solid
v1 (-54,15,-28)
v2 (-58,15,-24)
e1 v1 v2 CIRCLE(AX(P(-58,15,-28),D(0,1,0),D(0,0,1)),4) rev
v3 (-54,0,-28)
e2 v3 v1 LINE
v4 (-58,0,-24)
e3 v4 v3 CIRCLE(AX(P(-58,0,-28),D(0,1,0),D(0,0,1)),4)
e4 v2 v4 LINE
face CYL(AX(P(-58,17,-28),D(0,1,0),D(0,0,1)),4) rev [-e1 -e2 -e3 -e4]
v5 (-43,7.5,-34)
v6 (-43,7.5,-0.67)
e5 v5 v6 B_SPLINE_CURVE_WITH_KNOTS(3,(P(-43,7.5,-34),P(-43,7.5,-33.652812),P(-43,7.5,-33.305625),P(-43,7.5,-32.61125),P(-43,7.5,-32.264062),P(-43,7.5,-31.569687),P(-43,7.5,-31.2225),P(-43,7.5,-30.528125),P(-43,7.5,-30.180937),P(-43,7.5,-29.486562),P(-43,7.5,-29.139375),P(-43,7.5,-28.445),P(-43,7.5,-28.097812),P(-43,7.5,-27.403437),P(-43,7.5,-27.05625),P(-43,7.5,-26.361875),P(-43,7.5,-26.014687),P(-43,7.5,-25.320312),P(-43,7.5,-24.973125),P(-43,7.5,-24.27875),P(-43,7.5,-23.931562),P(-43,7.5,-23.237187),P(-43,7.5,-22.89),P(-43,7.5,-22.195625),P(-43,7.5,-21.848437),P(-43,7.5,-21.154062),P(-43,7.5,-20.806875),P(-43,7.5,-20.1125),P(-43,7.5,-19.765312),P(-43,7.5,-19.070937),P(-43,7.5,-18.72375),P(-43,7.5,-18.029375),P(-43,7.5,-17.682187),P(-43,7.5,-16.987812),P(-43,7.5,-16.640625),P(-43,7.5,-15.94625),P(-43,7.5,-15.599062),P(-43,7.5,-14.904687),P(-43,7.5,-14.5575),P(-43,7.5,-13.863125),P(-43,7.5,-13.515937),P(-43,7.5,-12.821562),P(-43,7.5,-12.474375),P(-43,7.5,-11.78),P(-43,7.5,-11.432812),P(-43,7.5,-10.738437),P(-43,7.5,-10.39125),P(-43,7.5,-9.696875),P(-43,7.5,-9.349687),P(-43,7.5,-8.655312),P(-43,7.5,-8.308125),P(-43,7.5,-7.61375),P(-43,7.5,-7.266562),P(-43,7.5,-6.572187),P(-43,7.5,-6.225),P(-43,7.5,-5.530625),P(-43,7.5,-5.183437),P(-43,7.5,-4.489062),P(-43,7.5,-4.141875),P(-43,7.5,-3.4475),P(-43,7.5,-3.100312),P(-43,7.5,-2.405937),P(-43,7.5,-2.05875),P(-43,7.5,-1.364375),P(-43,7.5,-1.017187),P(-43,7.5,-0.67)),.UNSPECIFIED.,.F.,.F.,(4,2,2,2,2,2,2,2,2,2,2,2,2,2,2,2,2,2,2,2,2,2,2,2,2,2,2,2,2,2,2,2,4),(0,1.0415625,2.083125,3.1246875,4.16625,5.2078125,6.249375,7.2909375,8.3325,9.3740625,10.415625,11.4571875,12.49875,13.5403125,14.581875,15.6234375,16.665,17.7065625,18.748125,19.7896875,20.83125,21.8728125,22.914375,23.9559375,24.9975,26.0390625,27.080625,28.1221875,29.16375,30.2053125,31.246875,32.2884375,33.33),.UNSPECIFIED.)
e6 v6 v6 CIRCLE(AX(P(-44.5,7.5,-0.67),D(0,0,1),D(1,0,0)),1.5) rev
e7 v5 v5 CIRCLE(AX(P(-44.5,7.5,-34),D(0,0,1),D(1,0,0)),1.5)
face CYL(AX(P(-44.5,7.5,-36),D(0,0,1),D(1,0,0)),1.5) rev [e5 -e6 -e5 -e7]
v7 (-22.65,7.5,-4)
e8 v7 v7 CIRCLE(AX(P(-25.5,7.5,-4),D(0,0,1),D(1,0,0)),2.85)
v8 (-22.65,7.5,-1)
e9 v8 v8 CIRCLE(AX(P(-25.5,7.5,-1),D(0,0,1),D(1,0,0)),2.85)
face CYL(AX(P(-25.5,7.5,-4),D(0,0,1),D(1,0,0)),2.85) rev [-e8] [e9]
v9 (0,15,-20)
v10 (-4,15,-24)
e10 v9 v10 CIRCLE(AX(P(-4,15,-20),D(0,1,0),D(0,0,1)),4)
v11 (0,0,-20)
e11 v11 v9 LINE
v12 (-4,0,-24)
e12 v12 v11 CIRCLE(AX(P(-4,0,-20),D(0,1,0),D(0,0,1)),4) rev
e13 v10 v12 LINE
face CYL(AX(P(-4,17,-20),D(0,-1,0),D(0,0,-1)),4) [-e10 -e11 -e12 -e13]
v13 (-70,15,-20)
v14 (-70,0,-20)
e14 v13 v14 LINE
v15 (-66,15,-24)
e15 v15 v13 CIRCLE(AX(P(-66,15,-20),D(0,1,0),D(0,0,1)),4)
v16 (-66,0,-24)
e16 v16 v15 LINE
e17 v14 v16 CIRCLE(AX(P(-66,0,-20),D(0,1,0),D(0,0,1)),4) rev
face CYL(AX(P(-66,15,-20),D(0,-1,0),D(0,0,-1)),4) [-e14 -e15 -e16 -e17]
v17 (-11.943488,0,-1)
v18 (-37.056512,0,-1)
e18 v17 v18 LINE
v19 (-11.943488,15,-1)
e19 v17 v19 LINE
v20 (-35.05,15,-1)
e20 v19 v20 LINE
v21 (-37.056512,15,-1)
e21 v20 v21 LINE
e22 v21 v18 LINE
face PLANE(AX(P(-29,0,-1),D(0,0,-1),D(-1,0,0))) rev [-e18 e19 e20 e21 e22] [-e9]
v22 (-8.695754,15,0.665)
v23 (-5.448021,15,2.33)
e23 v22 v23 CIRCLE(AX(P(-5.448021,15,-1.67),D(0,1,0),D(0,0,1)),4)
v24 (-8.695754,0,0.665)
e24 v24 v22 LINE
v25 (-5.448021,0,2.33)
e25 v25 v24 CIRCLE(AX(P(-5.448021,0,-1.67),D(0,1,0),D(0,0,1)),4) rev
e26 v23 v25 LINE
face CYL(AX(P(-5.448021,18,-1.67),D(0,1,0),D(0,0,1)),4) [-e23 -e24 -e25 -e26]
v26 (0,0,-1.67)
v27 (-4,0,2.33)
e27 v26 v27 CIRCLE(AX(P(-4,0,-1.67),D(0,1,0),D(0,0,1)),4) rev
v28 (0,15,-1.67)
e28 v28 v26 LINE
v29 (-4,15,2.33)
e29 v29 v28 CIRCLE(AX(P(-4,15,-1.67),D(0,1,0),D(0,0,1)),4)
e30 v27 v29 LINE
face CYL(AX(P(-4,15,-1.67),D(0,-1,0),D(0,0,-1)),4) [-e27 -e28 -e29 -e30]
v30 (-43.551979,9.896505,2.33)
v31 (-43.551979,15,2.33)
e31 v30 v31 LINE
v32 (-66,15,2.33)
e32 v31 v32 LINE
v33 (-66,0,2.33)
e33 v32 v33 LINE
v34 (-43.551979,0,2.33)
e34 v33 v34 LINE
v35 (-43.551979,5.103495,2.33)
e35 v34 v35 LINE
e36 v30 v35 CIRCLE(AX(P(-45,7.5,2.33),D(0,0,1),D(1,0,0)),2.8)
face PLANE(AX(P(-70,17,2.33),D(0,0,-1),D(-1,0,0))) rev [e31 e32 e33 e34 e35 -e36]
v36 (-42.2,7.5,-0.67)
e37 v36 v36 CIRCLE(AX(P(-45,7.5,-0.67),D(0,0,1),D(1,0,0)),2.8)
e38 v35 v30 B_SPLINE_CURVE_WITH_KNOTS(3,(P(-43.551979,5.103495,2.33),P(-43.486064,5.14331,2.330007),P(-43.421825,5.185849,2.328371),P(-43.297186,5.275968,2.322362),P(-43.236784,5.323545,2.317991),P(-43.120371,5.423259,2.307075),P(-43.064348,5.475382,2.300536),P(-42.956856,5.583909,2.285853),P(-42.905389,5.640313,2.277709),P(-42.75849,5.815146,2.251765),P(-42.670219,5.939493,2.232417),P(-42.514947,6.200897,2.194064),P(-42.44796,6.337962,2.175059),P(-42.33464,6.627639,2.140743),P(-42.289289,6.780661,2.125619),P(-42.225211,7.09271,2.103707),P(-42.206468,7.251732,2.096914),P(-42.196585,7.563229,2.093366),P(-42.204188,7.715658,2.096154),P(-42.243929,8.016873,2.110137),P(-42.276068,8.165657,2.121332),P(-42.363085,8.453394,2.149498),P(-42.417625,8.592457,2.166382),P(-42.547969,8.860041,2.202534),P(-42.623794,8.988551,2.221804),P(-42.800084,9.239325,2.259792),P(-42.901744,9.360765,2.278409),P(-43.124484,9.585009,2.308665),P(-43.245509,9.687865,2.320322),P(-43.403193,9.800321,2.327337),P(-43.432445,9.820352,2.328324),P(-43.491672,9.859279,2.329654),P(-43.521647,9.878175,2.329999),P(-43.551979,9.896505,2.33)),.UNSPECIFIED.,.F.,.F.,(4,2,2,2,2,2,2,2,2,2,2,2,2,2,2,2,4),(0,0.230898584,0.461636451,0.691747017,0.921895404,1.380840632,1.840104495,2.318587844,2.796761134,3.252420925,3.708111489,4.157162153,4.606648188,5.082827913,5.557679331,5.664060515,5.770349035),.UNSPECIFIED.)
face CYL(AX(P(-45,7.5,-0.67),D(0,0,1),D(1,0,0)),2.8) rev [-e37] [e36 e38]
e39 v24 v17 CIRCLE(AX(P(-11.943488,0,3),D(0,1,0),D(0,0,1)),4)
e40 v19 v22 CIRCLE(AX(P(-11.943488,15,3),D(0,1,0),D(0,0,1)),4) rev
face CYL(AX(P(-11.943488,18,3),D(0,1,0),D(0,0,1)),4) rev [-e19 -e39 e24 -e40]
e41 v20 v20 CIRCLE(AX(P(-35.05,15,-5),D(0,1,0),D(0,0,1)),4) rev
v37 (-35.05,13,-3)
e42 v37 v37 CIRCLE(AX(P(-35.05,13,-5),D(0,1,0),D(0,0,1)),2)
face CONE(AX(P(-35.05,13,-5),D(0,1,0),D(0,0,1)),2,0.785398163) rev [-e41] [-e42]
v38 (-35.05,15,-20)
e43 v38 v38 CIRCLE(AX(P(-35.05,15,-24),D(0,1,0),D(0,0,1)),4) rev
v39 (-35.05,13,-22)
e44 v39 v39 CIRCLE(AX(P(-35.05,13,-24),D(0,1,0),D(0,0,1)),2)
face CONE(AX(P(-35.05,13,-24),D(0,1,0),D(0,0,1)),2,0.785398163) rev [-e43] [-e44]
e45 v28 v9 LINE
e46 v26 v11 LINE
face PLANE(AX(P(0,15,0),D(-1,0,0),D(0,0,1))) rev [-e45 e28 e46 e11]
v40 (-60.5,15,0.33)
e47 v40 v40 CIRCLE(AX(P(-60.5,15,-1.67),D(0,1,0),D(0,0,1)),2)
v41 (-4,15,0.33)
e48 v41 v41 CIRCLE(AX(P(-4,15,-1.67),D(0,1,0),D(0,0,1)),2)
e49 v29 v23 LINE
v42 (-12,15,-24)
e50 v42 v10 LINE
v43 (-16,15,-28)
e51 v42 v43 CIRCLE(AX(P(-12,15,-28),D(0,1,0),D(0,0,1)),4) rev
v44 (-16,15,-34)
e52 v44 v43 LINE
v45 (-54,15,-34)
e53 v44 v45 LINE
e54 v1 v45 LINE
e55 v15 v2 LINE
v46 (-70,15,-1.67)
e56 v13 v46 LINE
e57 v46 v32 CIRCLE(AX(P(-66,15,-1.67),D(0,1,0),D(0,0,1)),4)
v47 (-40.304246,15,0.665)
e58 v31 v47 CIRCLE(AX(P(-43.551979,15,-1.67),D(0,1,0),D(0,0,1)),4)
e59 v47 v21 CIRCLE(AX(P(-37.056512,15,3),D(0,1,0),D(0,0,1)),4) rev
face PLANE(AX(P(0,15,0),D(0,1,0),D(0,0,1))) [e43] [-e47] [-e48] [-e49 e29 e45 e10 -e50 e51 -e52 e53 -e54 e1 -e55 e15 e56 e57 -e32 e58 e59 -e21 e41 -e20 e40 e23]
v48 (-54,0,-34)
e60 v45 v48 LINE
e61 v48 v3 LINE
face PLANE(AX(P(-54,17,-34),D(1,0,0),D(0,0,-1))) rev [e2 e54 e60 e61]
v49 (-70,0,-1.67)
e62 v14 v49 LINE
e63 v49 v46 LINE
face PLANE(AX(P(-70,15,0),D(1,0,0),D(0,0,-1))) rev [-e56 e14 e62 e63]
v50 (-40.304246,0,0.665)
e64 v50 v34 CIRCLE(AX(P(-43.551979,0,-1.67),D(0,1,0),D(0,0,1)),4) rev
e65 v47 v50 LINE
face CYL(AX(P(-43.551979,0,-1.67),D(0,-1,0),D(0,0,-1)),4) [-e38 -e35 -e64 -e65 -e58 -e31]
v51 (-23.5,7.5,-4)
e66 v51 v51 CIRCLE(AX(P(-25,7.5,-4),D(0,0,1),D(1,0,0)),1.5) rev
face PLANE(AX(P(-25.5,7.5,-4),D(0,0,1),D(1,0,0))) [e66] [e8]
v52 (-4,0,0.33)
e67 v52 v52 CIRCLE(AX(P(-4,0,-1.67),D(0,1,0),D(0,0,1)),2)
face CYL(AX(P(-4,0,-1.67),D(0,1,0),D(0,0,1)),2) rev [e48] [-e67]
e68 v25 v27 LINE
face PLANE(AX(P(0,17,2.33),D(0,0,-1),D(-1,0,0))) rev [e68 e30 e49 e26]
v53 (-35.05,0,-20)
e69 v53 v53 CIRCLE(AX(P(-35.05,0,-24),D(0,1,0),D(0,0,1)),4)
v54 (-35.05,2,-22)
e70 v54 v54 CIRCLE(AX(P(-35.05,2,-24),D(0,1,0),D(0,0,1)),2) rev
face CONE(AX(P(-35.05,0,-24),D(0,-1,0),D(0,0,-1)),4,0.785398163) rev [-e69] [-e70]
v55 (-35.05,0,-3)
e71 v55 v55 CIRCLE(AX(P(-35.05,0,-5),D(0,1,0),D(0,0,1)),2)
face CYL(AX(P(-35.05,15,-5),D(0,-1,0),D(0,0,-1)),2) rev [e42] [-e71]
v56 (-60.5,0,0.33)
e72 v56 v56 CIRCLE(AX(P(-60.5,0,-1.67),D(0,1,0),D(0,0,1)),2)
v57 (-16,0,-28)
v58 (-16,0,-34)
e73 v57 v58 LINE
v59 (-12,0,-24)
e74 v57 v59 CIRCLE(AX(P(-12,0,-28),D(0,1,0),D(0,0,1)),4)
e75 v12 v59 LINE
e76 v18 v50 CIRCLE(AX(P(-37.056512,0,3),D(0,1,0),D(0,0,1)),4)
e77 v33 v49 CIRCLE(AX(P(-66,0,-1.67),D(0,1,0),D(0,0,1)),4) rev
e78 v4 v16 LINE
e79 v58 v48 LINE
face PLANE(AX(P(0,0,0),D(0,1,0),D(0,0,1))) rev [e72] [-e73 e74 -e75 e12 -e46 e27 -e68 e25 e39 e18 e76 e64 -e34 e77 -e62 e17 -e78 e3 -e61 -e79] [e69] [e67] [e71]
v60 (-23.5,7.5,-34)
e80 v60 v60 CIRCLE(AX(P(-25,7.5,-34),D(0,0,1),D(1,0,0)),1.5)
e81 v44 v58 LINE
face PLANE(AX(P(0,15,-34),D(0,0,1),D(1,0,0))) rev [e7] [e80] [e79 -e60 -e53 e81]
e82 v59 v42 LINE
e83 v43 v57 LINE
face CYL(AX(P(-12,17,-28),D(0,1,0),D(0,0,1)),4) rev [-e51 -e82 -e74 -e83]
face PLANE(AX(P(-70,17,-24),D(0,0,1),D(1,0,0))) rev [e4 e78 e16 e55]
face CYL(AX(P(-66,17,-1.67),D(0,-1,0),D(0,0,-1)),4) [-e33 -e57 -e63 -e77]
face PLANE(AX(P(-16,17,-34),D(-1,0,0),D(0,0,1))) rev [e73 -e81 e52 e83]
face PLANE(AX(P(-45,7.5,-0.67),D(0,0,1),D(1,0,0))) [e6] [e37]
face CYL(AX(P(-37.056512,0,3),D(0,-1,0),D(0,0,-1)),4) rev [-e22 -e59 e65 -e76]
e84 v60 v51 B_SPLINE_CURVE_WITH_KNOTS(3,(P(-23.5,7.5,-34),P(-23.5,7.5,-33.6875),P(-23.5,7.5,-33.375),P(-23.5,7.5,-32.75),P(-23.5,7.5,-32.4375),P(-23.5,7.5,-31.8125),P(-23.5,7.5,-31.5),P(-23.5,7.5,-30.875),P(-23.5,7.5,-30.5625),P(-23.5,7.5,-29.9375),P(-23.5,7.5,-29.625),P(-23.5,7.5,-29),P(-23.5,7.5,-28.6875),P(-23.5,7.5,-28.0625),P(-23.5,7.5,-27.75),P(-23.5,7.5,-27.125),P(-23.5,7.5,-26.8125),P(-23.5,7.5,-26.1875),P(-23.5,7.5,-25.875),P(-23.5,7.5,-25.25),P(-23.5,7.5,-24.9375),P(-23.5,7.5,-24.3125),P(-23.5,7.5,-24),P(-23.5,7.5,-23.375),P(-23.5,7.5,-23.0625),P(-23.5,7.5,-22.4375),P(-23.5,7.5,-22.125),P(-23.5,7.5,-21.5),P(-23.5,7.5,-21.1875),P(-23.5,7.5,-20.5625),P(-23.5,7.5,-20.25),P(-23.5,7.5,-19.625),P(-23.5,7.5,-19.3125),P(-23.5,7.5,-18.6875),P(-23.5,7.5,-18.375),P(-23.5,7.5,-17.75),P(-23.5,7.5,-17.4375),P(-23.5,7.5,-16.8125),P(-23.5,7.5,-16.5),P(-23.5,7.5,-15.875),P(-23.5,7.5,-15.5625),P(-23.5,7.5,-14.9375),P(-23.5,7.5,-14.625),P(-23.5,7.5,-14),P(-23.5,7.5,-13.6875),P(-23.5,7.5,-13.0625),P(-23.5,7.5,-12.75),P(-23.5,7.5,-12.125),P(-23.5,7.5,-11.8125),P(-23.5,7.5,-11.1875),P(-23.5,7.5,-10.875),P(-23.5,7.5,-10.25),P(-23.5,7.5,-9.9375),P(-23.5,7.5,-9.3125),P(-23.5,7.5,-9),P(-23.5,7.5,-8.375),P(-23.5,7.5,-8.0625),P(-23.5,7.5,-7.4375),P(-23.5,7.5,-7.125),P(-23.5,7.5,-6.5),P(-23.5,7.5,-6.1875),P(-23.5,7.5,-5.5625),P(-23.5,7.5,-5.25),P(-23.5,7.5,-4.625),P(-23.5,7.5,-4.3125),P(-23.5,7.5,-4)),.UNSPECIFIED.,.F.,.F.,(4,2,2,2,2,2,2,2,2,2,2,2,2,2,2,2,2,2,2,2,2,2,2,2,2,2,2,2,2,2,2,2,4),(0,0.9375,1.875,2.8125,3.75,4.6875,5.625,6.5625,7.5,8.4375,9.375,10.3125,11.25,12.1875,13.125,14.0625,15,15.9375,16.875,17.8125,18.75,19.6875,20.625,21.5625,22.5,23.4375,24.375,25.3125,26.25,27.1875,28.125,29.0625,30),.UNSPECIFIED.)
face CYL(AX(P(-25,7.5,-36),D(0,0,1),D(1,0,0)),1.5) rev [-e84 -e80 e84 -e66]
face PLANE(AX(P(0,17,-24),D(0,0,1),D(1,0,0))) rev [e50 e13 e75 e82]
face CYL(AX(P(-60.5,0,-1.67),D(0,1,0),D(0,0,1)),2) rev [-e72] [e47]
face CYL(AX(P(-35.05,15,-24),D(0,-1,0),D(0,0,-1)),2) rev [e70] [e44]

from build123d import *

# Parameters (mm, degrees)
SKETCH1_W           = 70
SKETCH1_H           = 34
SKETCH1_R           = 2
BOSS_EXTRUDE1_DEPTH = 15
SKETCH6_W           = 70
SKETCH6_H           = 15
BOSS_EXTRUDE2_DEPTH = 5
SKETCH3_R           = 2
CUT_EXTRUDE2_DEPTH  = 15
SKETCH8_W           = 6
SKETCH8_H           = 5
CUT_EXTRUDE3_DEPTH  = 15
SKETCH9_W           = 12
SKETCH9_H           = 6
CUT_EXTRUDE4_DEPTH  = 15
SKETCH10_W          = 16
SKETCH10_H          = 10
CUT_EXTRUDE5_DEPTH  = 17
SKETCH12_R          = 1.5
CUT_EXTRUDE6_DEPTH  = 41
SKETCH13_W          = 27.5
SKETCH13_H          = 6
CUT_EXTRUDE7_DEPTH  = 20
SKETCH14_W          = 13.5
SKETCH14_H          = 2.67
SKETCH14_W_2        = 29
CUT_EXTRUDE8_DEPTH  = 17
FILLET2_R           = 4
SKETCH16_W          = 5.5
SKETCH16_H          = 3.33
CUT_EXTRUDE10_DEPTH = 18
FILLET4_R           = 4
FILLET5_R           = 4
SKETCH17_R          = 2.85
CUT_EXTRUDE11_DEPTH = 3
SKETCH18_R          = 2.8
CUT_EXTRUDE12_DEPTH = 3
CHAMFER1_SIZE       = 2


# Some blends are built 0.0001 mm under size
with BuildPart() as part:
    # Sketch1 → Boss-Extrude1 (new body)
    with BuildSketch(Plane(origin=(0, 0, 0), x_dir=(1, 0, 0), z_dir=(0, 1, 0))):
        with Locations((-35, 17)):
            Rectangle(SKETCH1_W, SKETCH1_H)
        with Locations(Location((-35.05, 24, 0), (0, 0, 270))):
            Circle(SKETCH1_R, mode=Mode.SUBTRACT)
        with Locations(Location((-35.05, 5, 0), (0, 0, 270))):
            Circle(SKETCH1_R, mode=Mode.SUBTRACT)
    extrude(amount=BOSS_EXTRUDE1_DEPTH)

    # Sketch6 → Boss-Extrude2 (add)
    with BuildSketch(Plane.XY):
        with Locations((-35, 7.5)):
            Rectangle(SKETCH6_W, SKETCH6_H)
    extrude(amount=BOSS_EXTRUDE2_DEPTH)

    # Sketch3 → Cut-Extrude2 (cut)
    with BuildSketch(Plane(origin=(0, 15, 0), x_dir=(1, 0, 0), z_dir=(0, 1, 0))):
        with Locations(Location((-4, 1.67, 0), (0, 0, 270))):
            Circle(SKETCH3_R)
        with Locations(Location((-60.5, 1.67, 0), (0, 0, 270))):
            Circle(SKETCH3_R)
    extrude(amount=-CUT_EXTRUDE2_DEPTH, mode=Mode.SUBTRACT)

    # Sketch8 → Cut-Extrude3 (cut)
    with BuildSketch(Plane(origin=(0, 15, 0), x_dir=(1, 0, 0), z_dir=(0, 1, 0))):
        with Locations((-16.5, -2.5)):
            Rectangle(SKETCH8_W, SKETCH8_H)
    extrude(amount=-CUT_EXTRUDE3_DEPTH, mode=Mode.SUBTRACT)

    # Sketch9 → Cut-Extrude4 (cut)
    with BuildSketch(Plane(origin=(0, 15, 0), x_dir=(1, 0, 0), z_dir=(0, 1, 0))):
        with Locations((-35, -2)):
            Rectangle(SKETCH9_W, SKETCH9_H)
    extrude(amount=-CUT_EXTRUDE4_DEPTH, mode=Mode.SUBTRACT)

    # Sketch10 → Cut-Extrude5 (cut)
    with BuildSketch(Plane.XZ):
        with Locations((-8, -29)):
            Rectangle(SKETCH10_W, SKETCH10_H)
        with Locations((-62, -29)):
            Rectangle(SKETCH10_W, SKETCH10_H)
    extrude(amount=-CUT_EXTRUDE5_DEPTH, mode=Mode.SUBTRACT)

    # Sketch12 → Cut-Extrude6 (cut)
    with BuildSketch(Plane.XY.offset(5)):
        with Locations((-44.5, 7.5)):
            Circle(SKETCH12_R)
        with Locations((-25, 7.499999999)):
            Circle(SKETCH12_R)
    extrude(amount=-CUT_EXTRUDE6_DEPTH, mode=Mode.SUBTRACT)

    # Sketch13 → Cut-Extrude7 (cut)
    with BuildSketch(Plane(origin=(0, 15, 0), x_dir=(1, 0, 0), z_dir=(0, 1, 0))):
        with Locations((-27.25, -2)):
            Rectangle(SKETCH13_W, SKETCH13_H)
    extrude(amount=-CUT_EXTRUDE7_DEPTH, mode=Mode.SUBTRACT)

    # Sketch14 → Cut-Extrude8 (cut)
    with BuildSketch(Plane(origin=(0, 0, 0), x_dir=(-1, 0, 0), z_dir=(0, -1, 0))):
        with Locations((6.75, -3.665)):
            Rectangle(SKETCH14_W, SKETCH14_H)
        with Locations((55.5, -3.665)):
            Rectangle(SKETCH14_W_2, SKETCH14_H)
    extrude(amount=-CUT_EXTRUDE8_DEPTH, mode=Mode.SUBTRACT)

    # Fillet2
    fillet2_edges = [part.edges().sort_by_distance(p)[0] for p in [
        (0, 7.5, 2.33),
        (-70, 7.5, 2.33),
        (-70, 7.5, -24),
        (0, 7.5, -24),
    ]]
    fillet(fillet2_edges, radius=FILLET2_R)

    # Sketch16 → Cut-Extrude10 (cut)
    with BuildSketch(Plane.XZ):
        with Locations((-10.75, 0.665)):
            Rectangle(SKETCH16_W, SKETCH16_H)
    extrude(amount=-CUT_EXTRUDE10_DEPTH, mode=Mode.SUBTRACT)

    # Fillet4
    # the kernel refuses this fillet: 4 mm, written as the material it adds along each edge
    with BuildSketch(Plane(origin=(-16, 0, -24), x_dir=(1, 0, 0), z_dir=(0, 1, 0)), Plane(origin=(-54, 0, -24), x_dir=(0, 0, -1), z_dir=(0, 1, 0))) as fillet4_piece_1:
        with BuildLine():
            CenterArc((FILLET4_R, FILLET4_R), FILLET4_R, 180, 90)
            Line((0, FILLET4_R), (-FILLET4_R * 0.02, FILLET4_R))
            Line((-FILLET4_R * 0.02, FILLET4_R), (-FILLET4_R * 0.02, -FILLET4_R * 0.02))
            Line((-FILLET4_R * 0.02, -FILLET4_R * 0.02), (FILLET4_R, -FILLET4_R * 0.02))
            Line((FILLET4_R, -FILLET4_R * 0.02), (FILLET4_R, 0))
        make_face()
    extrude(amount=15)
    with BuildSketch(Plane(origin=(-41, 15, -1), x_dir=(0, 0, 1), z_dir=(0, -1, 0))) as fillet4_piece_2:
        with BuildLine():
            CenterArc((4, -3.943488304), FILLET4_R, 99.642495459, 80.357504541)
            Line((0, -3.943488304), (-0.08, -3.943488304))
            Line((-0.08, -3.943488304), (-0.08, 0))
            Line((-0.08, 0), (0, 0.08))
            ThreePointArc((0, 0.08), (1.665, 0.08), (3.3166, 0.078869766))
            Line((3.3166, 0.078869766), (3.33, 0))
        make_face()
    extrude(amount=15)
    with BuildSketch(Plane(origin=(-8, 0, -1), x_dir=(-1.0, 0, -8.691057696161095e-11), z_dir=(0, 1, 0))) as fillet4_piece_3:
        with BuildLine():
            CenterArc((3.943488303, 4), FILLET4_R, 189.642495464, 80.357504541)
            Line((0, 3.33), (-0.078869766, 3.3166))
            ThreePointArc((-0.078869766, 3.3166), (-0.08, 1.665), (-0.08, 0))
            Line((-0.08, 0), (0, -0.08))
            Line((0, -0.08), (3.943488304, -0.08))
            Line((3.943488304, -0.08), (3.943488304, 0))
        make_face()
    extrude(amount=15)

    # Fillet5
    # the kernel refuses this fillet: 4 mm, written as the material it takes off along each edge
    with BuildSketch(Plane(origin=(-41, -6.379948368, 2.33), x_dir=(0.3855616700587326, 0, -0.922682067985241), z_dir=(0, 1, 0))) as fillet5_piece_1:
        with BuildLine():
            CenterArc((2.706782853, 3.896912262), FILLET5_R, 202.67861385, 54.285267758)
            Line((-0.983945419, 2.354665582), (0, 0))
            ThreePointArc((0, 0), (0.902260951, 0.103087738), (1.804521902, 0))
        make_face()
    extrude(amount=27.759896736, mode=Mode.SUBTRACT)
    with BuildSketch(Plane(origin=(-8, -6.379948368, 2.33), x_dir=(-0.38556167005872005, 0, -0.9226820679852463), z_dir=(0, 1, 0))) as fillet5_piece_2:
        with BuildLine():
            CenterArc((2.706782853, -3.896912262), FILLET5_R, 103.036118392, 54.285267758)
            Line((-0.983945419, -2.354665582), (0, 0))
            ThreePointArc((0, 0), (0.902260951, -0.103087738), (1.804521902, 0))
        make_face()
    extrude(amount=27.759896736, mode=Mode.SUBTRACT)

    # Sketch17 → Cut-Extrude11 (cut)
    with BuildSketch(Plane.XY.offset(-1)):
        with Locations((-25.499999999, 7.499999999)):
            Circle(SKETCH17_R)
    extrude(amount=-CUT_EXTRUDE11_DEPTH, mode=Mode.SUBTRACT)

    # Sketch18 → Cut-Extrude12 (cut)
    with BuildSketch(Plane.XY.offset(2.33)):
        with Locations((-45, 7.5)):
            Circle(SKETCH18_R)
    extrude(amount=-CUT_EXTRUDE12_DEPTH, mode=Mode.SUBTRACT)

    # Chamfer1
    chamfer1_edges = [part.edges().sort_by_distance(p)[0] for p in [
        (-35.05, 0, -26),
        (-35.05, 15, -26),
        (-35.05, 15, -7),
    ]]
    chamfer(chamfer1_edges, length=CHAMFER1_SIZE - 0.0001)  # a hair under: the kernel refuses the full size


solid = part.part
